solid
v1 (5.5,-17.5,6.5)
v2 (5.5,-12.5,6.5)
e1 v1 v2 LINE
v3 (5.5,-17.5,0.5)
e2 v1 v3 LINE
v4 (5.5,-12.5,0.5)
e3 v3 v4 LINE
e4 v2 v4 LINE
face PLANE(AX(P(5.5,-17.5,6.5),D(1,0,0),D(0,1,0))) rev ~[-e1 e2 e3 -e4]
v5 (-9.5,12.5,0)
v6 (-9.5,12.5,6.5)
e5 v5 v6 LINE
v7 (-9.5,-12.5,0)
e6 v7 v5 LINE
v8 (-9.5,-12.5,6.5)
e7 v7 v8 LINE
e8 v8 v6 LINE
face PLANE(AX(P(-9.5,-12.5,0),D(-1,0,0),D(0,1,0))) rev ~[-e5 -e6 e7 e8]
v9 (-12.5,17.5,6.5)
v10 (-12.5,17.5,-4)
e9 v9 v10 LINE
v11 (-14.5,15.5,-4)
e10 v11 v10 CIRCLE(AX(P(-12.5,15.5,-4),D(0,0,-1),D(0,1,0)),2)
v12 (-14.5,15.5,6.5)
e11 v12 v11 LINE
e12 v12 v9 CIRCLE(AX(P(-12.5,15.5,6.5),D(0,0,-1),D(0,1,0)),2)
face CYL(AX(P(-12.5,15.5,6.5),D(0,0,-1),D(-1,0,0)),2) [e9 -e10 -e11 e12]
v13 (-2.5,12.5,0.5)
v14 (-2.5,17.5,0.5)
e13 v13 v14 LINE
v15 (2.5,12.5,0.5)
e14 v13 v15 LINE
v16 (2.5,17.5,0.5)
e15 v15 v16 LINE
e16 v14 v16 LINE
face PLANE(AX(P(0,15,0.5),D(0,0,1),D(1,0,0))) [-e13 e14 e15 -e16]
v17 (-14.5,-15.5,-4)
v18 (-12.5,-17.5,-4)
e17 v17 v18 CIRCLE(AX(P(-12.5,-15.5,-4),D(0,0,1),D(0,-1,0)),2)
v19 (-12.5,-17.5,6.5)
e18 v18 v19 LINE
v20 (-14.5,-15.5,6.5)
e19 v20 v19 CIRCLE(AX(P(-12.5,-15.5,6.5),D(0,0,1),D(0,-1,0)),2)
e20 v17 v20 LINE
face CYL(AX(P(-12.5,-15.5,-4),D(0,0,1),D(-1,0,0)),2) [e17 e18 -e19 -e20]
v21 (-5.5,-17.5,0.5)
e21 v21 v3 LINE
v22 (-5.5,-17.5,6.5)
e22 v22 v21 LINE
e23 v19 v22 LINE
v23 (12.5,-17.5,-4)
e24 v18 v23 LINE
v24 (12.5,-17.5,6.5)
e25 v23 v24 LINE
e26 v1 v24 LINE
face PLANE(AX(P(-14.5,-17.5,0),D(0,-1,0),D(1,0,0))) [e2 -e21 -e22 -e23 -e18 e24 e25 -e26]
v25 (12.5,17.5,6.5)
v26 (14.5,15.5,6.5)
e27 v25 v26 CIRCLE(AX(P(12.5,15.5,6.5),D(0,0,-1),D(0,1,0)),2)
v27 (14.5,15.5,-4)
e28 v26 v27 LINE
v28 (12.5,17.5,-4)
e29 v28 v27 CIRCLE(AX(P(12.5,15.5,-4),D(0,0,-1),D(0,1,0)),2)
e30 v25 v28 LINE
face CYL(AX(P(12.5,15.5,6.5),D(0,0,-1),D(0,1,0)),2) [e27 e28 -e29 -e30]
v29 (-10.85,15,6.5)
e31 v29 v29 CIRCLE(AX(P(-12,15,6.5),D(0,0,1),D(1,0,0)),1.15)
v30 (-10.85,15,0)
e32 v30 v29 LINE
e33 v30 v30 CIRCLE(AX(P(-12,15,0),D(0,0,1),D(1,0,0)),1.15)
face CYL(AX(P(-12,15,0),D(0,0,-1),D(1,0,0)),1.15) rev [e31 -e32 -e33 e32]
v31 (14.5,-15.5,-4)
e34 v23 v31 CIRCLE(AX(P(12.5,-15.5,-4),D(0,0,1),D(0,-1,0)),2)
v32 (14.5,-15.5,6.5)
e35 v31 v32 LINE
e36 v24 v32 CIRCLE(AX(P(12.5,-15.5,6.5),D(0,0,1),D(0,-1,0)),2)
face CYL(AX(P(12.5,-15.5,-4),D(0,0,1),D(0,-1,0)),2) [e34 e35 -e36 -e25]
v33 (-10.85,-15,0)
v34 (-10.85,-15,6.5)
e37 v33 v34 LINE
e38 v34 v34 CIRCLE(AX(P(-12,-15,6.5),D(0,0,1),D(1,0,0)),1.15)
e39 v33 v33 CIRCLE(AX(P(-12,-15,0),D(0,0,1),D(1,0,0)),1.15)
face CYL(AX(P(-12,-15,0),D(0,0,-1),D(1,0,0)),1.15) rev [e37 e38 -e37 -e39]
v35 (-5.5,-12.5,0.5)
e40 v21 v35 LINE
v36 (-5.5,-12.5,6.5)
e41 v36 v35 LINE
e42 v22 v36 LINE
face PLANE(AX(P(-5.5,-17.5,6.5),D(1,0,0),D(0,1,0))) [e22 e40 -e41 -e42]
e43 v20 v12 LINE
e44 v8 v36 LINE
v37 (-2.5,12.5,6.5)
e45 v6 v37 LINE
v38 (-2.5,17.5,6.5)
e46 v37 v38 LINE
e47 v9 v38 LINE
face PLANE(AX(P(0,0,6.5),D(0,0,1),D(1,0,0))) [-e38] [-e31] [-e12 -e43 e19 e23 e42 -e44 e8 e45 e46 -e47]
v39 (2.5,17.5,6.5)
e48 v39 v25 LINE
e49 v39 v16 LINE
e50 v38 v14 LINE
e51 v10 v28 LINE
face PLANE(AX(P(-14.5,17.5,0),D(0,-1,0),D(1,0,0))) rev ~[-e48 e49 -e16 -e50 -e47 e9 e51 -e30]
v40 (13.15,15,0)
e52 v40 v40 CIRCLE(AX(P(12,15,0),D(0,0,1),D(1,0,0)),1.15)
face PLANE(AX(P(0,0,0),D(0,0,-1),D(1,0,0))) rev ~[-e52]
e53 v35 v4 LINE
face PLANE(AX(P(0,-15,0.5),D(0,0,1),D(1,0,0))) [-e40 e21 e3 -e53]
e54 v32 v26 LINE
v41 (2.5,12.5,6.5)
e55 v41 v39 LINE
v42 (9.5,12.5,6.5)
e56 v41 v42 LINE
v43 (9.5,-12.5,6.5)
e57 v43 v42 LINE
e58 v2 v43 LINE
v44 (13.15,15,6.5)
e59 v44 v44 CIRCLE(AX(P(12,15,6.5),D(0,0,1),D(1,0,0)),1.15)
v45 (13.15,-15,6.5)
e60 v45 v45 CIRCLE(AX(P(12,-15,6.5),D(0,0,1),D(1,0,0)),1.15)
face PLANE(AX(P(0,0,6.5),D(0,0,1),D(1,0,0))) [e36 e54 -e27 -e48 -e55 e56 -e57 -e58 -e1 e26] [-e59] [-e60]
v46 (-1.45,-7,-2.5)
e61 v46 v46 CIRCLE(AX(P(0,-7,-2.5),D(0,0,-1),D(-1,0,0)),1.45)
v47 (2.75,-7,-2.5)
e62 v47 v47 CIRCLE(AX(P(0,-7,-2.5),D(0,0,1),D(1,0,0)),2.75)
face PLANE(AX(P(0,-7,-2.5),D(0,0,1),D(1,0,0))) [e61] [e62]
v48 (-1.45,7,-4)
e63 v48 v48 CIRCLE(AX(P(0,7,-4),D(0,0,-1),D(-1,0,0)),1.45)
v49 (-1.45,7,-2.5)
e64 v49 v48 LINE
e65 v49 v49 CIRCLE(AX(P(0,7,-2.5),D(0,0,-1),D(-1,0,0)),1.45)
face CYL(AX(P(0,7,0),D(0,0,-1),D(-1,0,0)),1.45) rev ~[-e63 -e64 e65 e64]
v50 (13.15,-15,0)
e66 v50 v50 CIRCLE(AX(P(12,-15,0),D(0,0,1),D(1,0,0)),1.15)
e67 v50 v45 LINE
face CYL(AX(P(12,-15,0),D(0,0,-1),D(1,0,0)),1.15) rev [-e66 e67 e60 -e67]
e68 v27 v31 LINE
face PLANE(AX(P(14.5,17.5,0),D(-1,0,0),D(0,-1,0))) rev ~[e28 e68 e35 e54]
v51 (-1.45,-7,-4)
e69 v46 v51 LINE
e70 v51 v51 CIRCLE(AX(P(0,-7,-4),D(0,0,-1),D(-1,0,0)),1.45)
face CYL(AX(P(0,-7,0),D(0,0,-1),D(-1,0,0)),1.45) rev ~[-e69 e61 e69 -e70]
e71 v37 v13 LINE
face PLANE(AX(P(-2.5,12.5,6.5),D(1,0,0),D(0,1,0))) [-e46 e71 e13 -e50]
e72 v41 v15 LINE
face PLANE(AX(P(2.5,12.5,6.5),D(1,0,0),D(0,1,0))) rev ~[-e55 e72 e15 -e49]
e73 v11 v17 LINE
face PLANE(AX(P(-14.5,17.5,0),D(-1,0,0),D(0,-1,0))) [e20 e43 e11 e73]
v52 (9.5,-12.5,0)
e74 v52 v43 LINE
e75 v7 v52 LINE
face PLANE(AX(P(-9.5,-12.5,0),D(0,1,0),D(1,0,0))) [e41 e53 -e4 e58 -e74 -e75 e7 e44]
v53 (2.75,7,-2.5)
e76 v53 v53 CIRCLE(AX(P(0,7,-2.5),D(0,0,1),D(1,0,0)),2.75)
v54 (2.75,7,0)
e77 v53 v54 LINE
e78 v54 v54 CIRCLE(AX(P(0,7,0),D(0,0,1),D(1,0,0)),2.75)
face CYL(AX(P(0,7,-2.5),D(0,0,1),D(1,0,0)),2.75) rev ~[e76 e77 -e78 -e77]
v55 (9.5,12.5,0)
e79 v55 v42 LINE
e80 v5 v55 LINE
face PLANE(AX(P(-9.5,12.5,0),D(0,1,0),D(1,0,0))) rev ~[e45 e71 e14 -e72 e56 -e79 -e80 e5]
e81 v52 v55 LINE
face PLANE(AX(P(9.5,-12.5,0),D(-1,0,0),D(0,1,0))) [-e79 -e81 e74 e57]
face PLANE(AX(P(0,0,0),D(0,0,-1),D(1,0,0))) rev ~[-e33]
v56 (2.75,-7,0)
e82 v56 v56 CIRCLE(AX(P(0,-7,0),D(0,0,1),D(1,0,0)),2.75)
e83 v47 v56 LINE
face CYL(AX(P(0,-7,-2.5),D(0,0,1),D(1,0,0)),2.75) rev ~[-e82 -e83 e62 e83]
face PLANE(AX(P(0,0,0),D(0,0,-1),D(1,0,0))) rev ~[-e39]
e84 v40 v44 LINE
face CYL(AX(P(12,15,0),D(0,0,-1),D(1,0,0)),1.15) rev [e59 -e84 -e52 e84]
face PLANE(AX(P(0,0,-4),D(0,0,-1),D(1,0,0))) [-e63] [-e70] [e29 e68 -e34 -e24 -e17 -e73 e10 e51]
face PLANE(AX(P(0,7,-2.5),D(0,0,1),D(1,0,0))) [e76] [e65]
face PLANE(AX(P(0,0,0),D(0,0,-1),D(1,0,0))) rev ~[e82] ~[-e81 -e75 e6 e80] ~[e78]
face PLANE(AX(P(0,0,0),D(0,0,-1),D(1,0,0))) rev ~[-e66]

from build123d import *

# Parameters (mm, degrees)
F0_W           = 29
F0_H           = 35
F0_R           = 1.15
F0_W_2         = 19
F0_H_2         = 25
F1_DEPTH       = 6.5
F2_W           = 29
F2_H           = 35
F2_R           = 1.15
F2_W_2         = 19
F2_H_2         = 25
F3_DEPTH       = 4
F4_W           = 11
F4_H           = 5
F4_W_2         = 5
F5_DEPTH       = 6
F6_R           = 2
F8_D           = 2.9
F8_CBORE_D     = 5.5
F8_CBORE_DEPTH = 2.5


with BuildPart() as f1:
    # F0 (on Top) → F1 (new body)
    with BuildSketch(Plane.XY):
        Rectangle(F0_W, F0_H)
        with Locations((-12, -15)):
            Circle(F0_R, mode=Mode.SUBTRACT)
        with Locations((12, -15)):
            Circle(F0_R, mode=Mode.SUBTRACT)
        with Locations((-12, 15)):
            Circle(F0_R, mode=Mode.SUBTRACT)
        Rectangle(F0_W_2, F0_H_2, mode=Mode.SUBTRACT)
        with Locations((12, 15)):
            Circle(F0_R, mode=Mode.SUBTRACT)
    extrude(amount=F1_DEPTH)

    # F2 (on face) → F3 (join)
    with BuildSketch(Plane(origin=(0, 0, 0), x_dir=(1, 0, 0), z_dir=(0, 0, -1))):
        Rectangle(F2_W, F2_H)
        with Locations((-12, -15)):
            Circle(F2_R, mode=Mode.SUBTRACT)
        with Locations((12, -15)):
            Circle(F2_R, mode=Mode.SUBTRACT)
        with Locations((-12, 15)):
            Circle(F2_R, mode=Mode.SUBTRACT)
        Rectangle(F2_W_2, F2_H_2, mode=Mode.SUBTRACT)
        with Locations((12, 15)):
            Circle(F2_R, mode=Mode.SUBTRACT)
        with Locations((-12, 15)):
            Circle(F2_R)
        with Locations((12, 15)):
            Circle(F2_R)
        with Locations((-12, -15)):
            Circle(F2_R)
        Rectangle(F2_W_2, F2_H_2)
        with Locations((12, -15)):
            Circle(F2_R)
    extrude(amount=F3_DEPTH)

    # F4 (on face) → F5 (cut)
    with BuildSketch(Plane.XY.offset(6.5)):
        with Locations((0, -15)):
            Rectangle(F4_W, F4_H)
        with Locations((0, 15)):
            Rectangle(F4_W_2, F4_H)
    extrude(amount=-F5_DEPTH, mode=Mode.SUBTRACT)

    # F6
    f6_edges = [f1.edges().sort_by_distance(p)[0] for p in [
        (-14.5, 17.5, 1.25),
        (14.5, 17.5, 1.25),
        (14.5, -17.5, 1.25),
        (-14.5, -17.5, 1.25),
    ]]
    fillet(f6_edges, radius=F6_R)

    # F8 (through all)
    with Locations(Plane.XY):
        with Locations((0, 7), (0, -7)):
            CounterBoreHole(F8_D / 2, F8_CBORE_D / 2, F8_CBORE_DEPTH)


solid = f1.part
